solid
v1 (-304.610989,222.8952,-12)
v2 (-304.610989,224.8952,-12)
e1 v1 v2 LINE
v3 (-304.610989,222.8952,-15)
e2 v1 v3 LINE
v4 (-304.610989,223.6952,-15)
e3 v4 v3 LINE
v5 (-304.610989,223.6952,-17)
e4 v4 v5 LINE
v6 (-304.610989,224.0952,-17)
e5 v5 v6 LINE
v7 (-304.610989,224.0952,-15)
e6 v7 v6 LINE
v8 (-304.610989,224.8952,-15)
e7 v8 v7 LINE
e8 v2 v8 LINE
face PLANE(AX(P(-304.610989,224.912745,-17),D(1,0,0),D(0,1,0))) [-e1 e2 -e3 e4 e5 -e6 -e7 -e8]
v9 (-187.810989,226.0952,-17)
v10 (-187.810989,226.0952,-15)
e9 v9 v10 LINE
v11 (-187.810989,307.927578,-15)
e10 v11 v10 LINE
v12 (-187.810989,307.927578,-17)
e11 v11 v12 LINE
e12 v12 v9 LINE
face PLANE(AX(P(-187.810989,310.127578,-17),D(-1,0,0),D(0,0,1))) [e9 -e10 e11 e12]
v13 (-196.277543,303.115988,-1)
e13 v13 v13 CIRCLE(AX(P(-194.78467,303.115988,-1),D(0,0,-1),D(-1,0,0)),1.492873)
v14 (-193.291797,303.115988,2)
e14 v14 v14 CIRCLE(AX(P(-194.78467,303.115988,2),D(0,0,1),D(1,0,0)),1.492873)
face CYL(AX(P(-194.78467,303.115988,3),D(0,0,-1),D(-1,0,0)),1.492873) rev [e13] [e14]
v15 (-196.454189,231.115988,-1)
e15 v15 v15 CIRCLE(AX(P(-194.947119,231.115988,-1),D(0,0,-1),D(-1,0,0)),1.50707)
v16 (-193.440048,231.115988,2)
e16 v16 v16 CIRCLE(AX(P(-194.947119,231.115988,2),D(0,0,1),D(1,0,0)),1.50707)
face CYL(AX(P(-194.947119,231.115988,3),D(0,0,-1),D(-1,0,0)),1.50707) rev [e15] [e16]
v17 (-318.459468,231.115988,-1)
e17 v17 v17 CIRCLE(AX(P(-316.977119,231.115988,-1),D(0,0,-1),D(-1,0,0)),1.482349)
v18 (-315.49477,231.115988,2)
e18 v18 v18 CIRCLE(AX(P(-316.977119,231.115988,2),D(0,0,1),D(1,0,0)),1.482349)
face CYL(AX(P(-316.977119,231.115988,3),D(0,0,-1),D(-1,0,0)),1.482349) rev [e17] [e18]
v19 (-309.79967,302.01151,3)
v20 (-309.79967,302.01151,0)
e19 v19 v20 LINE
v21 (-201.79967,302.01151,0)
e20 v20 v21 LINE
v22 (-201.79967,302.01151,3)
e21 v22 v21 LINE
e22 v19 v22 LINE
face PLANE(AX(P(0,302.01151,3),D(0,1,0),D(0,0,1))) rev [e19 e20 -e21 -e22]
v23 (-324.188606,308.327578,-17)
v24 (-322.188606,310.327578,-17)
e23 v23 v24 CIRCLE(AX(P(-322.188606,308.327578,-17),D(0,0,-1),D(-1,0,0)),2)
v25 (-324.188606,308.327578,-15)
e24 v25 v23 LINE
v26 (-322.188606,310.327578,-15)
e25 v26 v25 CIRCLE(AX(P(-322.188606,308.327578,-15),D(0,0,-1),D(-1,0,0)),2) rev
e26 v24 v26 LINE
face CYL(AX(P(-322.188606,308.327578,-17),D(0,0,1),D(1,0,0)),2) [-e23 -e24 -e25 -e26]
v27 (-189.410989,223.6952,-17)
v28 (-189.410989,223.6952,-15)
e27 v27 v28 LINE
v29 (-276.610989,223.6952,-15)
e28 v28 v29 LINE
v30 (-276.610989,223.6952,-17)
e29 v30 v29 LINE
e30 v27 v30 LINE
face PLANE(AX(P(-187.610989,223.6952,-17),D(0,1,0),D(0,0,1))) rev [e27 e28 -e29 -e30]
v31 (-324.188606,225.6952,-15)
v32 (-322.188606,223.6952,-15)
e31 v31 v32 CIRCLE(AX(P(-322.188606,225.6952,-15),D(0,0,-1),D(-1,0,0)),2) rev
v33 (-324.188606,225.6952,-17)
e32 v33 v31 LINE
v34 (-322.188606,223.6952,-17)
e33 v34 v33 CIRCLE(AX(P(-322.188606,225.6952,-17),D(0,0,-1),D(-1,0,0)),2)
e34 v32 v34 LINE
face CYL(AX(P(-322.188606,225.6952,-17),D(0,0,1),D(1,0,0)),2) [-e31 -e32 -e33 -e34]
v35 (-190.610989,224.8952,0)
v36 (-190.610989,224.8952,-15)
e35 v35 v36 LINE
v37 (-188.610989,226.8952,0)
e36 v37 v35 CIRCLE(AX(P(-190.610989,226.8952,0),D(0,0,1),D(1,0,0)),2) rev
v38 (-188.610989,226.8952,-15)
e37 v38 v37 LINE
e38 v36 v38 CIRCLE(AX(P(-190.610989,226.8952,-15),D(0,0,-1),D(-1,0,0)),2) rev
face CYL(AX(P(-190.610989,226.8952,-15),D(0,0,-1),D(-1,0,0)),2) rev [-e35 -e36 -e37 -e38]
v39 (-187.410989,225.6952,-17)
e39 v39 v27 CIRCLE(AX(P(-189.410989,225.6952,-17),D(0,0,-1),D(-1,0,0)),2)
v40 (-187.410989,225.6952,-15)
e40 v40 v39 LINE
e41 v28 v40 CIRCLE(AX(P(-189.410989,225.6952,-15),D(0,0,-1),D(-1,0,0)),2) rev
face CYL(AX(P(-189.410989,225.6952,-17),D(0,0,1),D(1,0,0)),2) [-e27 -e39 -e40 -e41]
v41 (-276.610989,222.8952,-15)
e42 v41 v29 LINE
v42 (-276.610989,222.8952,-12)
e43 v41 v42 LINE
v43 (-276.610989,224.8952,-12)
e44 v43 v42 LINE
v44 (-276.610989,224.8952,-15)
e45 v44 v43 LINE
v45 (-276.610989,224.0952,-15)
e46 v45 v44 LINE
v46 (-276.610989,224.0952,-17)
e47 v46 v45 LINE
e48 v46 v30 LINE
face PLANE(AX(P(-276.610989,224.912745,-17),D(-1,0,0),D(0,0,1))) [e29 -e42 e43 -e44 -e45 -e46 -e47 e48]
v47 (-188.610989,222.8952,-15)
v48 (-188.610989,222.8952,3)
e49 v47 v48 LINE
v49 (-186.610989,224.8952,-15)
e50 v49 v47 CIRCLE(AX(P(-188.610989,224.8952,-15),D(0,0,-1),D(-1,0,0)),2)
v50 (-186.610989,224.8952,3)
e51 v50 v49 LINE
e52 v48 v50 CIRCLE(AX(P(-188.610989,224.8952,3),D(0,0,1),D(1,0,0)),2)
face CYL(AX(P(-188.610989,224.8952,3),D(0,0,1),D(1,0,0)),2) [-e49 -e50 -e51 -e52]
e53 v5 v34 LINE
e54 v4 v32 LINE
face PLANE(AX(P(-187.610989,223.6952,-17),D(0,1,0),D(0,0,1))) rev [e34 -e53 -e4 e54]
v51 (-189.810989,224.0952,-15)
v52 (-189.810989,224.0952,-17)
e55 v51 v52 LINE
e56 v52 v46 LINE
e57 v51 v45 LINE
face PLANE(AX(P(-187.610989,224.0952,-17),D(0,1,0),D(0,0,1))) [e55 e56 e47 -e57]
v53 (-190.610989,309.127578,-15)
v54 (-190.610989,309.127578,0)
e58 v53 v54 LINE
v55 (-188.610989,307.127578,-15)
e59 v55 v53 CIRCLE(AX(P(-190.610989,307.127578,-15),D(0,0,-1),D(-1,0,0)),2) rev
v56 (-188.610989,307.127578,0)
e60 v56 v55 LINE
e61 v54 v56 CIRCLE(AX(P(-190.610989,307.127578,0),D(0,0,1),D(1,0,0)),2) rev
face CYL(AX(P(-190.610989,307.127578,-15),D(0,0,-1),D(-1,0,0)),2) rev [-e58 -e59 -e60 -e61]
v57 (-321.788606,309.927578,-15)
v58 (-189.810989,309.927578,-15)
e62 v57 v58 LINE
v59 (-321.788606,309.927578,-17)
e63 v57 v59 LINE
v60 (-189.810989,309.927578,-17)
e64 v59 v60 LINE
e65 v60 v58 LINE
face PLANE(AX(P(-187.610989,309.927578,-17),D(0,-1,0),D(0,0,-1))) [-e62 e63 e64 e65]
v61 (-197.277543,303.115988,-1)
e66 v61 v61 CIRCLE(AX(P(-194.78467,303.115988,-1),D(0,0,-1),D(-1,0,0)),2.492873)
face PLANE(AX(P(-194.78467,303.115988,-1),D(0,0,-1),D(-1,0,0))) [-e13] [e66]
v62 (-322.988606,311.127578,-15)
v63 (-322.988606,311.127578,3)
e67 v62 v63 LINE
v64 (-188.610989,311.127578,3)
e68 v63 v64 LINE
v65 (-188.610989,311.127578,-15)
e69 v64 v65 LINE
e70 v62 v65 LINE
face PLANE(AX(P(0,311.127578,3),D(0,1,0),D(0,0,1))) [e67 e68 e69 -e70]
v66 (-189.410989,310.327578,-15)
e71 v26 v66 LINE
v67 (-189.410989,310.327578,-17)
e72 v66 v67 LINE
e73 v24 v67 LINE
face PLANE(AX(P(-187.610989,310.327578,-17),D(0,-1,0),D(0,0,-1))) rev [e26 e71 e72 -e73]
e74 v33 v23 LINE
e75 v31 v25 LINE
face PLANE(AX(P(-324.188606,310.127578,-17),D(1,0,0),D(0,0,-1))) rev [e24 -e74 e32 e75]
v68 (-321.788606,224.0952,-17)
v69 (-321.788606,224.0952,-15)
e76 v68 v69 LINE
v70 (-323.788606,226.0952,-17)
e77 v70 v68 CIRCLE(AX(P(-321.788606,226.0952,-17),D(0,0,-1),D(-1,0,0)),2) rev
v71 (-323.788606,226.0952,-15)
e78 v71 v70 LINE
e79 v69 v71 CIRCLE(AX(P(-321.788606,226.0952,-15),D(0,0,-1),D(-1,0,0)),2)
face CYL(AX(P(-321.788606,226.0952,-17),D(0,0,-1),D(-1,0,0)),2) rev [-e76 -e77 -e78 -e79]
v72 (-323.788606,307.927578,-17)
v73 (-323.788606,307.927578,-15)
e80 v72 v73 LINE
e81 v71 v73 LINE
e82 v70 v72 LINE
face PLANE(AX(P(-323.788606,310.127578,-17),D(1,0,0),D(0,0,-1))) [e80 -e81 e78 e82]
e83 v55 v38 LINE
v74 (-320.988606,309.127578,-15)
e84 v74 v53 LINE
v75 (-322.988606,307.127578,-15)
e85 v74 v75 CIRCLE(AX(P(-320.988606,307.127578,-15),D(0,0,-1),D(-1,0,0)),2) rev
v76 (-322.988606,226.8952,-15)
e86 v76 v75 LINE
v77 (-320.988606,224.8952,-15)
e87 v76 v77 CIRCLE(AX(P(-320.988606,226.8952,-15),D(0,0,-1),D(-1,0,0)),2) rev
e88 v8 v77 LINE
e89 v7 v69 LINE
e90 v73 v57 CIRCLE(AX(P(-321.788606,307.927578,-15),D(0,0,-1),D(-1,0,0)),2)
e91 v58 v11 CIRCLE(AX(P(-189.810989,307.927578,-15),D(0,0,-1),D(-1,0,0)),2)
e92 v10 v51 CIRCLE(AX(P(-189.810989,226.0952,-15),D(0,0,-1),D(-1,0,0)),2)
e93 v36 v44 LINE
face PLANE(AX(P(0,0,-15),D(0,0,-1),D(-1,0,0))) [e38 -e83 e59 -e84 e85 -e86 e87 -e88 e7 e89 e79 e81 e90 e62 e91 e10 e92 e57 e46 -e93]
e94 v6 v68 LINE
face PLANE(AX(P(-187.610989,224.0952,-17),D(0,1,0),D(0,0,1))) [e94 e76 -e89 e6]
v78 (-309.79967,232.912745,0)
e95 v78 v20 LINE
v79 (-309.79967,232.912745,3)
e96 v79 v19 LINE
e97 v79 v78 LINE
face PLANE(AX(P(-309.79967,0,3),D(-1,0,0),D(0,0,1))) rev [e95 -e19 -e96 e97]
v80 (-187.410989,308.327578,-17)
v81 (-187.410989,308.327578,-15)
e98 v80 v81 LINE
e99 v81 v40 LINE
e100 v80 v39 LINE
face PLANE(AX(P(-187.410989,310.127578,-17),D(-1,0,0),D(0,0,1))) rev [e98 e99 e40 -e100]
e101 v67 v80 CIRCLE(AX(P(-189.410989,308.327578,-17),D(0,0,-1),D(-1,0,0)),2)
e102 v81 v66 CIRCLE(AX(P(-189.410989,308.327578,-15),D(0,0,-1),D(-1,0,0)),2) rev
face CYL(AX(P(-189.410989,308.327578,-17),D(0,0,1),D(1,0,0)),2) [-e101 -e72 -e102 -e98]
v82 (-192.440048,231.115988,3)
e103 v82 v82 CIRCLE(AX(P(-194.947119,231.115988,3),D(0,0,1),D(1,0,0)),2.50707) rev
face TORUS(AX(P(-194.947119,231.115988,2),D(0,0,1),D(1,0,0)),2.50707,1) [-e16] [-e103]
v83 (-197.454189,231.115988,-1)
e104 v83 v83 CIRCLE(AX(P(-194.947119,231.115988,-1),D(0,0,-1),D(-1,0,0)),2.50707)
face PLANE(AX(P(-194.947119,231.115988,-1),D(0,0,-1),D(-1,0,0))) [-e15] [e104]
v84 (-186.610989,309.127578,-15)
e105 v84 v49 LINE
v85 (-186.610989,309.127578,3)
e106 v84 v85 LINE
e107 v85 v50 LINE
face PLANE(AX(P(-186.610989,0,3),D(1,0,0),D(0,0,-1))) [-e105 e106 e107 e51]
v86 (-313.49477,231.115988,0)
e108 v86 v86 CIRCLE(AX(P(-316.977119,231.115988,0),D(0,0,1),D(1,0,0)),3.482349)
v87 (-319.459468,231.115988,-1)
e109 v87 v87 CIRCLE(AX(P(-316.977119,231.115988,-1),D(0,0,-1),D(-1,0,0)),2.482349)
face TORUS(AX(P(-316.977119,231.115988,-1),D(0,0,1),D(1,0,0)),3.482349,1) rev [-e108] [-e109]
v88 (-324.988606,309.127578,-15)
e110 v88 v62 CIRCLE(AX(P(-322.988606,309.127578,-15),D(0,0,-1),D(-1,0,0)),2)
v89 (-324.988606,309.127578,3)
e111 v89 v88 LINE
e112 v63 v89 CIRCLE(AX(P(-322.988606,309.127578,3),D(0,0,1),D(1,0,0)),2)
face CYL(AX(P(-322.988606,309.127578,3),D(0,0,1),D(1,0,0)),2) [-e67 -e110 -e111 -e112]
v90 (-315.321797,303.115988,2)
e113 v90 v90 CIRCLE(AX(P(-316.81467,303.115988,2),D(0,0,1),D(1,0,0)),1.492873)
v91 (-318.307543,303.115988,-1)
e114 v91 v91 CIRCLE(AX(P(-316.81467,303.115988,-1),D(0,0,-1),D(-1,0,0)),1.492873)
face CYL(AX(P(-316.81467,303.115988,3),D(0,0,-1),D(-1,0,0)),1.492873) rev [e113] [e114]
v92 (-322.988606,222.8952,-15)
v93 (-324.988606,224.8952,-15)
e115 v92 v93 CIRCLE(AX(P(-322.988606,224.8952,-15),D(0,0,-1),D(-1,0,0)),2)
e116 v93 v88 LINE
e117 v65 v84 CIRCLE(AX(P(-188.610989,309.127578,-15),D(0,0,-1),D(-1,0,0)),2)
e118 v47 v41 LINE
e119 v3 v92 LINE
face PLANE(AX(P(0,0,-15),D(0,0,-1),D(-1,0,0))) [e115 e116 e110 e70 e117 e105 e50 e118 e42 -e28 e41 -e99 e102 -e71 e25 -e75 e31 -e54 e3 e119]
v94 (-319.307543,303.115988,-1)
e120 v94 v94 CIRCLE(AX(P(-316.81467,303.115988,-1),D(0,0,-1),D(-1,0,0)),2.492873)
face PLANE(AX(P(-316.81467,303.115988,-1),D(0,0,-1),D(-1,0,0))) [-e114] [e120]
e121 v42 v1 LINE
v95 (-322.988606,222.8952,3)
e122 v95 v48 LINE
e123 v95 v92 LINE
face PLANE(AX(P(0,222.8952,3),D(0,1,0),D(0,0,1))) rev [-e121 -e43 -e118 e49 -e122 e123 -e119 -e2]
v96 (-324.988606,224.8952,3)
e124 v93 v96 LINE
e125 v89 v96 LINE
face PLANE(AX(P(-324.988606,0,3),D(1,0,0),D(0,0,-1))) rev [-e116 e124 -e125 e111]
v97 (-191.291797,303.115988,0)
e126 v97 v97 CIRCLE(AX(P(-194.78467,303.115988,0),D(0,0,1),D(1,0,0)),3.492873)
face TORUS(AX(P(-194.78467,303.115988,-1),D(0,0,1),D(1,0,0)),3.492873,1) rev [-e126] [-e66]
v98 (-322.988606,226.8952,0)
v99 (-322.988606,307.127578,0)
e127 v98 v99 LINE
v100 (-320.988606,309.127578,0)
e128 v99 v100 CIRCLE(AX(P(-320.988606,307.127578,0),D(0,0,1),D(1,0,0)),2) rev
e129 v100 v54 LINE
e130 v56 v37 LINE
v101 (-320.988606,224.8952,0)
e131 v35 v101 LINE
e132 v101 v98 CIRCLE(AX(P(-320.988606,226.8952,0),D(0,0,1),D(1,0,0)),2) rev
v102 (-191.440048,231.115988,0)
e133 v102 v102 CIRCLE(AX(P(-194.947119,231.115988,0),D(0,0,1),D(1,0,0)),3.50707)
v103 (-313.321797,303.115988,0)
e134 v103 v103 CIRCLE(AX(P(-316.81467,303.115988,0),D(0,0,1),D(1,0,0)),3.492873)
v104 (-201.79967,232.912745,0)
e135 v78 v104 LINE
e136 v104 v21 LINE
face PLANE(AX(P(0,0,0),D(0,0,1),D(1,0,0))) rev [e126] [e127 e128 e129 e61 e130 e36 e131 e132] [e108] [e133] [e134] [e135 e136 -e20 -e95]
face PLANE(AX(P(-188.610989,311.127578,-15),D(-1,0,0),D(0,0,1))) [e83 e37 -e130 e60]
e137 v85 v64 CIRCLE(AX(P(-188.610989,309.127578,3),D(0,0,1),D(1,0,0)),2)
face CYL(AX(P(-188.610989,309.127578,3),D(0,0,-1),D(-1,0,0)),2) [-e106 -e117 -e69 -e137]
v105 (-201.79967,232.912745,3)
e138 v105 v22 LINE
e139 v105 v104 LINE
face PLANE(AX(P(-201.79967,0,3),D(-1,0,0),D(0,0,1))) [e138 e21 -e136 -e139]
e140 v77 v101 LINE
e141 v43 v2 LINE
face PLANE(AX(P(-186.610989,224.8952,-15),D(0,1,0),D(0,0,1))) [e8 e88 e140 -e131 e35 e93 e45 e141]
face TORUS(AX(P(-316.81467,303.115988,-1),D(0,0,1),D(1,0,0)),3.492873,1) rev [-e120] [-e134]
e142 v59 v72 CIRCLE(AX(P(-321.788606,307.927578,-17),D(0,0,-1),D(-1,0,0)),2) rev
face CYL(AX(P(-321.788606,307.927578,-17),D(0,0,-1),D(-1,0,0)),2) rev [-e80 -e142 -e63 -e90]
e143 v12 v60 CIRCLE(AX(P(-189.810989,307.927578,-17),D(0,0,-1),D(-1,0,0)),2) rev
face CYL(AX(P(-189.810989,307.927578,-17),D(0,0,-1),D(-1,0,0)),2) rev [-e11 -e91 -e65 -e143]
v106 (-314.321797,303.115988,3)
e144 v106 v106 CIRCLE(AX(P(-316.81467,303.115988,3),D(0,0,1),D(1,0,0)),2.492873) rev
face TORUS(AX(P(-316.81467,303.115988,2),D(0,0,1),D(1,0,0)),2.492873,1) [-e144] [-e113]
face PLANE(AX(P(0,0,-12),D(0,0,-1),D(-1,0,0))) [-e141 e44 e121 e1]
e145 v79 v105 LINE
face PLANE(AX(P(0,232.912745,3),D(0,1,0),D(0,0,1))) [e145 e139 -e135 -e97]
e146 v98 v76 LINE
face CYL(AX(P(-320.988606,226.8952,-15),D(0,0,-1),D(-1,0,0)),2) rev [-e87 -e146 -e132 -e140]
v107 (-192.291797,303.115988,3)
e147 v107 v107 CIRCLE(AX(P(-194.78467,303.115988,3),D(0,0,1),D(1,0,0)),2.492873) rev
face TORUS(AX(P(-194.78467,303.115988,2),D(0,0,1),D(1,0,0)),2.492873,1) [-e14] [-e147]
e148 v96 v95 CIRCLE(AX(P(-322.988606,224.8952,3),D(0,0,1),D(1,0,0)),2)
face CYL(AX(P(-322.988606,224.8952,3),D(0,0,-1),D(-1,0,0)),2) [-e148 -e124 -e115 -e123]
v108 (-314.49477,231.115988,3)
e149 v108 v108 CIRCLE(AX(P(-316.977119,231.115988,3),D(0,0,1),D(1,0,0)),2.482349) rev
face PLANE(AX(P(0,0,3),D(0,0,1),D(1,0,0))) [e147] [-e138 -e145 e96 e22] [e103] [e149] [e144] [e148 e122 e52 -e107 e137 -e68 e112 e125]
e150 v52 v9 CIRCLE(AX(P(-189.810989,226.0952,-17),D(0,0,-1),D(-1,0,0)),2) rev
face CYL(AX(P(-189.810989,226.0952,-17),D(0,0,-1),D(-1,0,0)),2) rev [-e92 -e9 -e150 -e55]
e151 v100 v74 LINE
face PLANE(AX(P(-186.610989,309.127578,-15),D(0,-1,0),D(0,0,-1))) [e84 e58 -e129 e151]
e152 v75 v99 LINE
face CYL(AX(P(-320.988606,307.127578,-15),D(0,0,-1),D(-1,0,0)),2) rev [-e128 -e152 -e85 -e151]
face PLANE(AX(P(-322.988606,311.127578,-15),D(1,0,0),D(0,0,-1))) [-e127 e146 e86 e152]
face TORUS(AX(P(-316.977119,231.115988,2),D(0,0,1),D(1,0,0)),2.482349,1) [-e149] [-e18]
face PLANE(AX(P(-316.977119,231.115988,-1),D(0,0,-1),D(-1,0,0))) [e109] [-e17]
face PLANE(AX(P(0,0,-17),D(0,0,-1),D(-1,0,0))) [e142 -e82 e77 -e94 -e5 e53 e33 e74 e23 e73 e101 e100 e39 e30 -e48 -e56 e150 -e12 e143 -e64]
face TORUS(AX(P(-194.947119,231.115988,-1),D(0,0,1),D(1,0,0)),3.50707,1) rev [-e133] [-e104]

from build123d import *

# Parameters (mm, degrees)
SZKIC2_W                          = 138.377616904
SZKIC2_H                          = 88.232378654
SZKIC2_R                          = 1.492872888
SZKIC2_R_2                        = 1.482348965
SZKIC2_R_3                        = 1.507070184
SZKIC2_W_2                        = 108
SZKIC2_H_2                        = 69.098765565
DODANIE_WYCI_GNI_CIE1_DEPTH       = 3
SZKIC3_W                          = 138.377616904
SZKIC3_H                          = 88.232378654
SZKIC3_W_2                        = 134.377616904
SZKIC3_H_2                        = 84.232378654
WYCI_GNI_CIE_CIENKA_CIANKA1_DEPTH = 15
ZAOKR_GLENIE1_R                   = 1
DODANIE_WYCI_GNI_CIE2_START       = 1
SZKIC4_R                          = 2.492872888
SZKIC4_R_2                        = 1.492872888
SZKIC4_R_3                        = 2.507070184
SZKIC4_R_4                        = 1.507070184
SZKIC4_R_5                        = 2.482348965
SZKIC4_R_6                        = 1.482348965
DODANIE_WYCI_GNI_CIE2_DEPTH       = 1
ZAOKR_GLENIE2_R                   = 1
SZKIC5_W                          = 136.777616904
SZKIC5_H                          = 86.632378654
SZKIC5_W_2                        = 135.977616904
SZKIC5_H_2                        = 85.832378654
WYCI_GNI_CIE_CIENKA_CIANKA2_DEPTH = 2
ZAOKR_GLENIE3_R                   = 2
WYTNIJ_WYCI_GNI_CIE1_START        = 12
SZKIC6_W                          = 28
SZKIC6_H                          = 7.331859192
WYTNIJ_WYCI_GNI_CIE1_DEPTH        = 439.2299015


with BuildPart() as part:
    # Szkic2 → Dodanie-wyciągnięcie1 (new body)
    with BuildSketch(Plane.XY):
        with Locations((-255.799797678, 267.011389153)):
            Rectangle(SZKIC2_W, SZKIC2_H)
        with Locations((-316.814669774, 303.115988479)):
            Circle(SZKIC2_R, mode=Mode.SUBTRACT)
        with Locations((-316.977118633, 231.115988479)):
            Circle(SZKIC2_R_2, mode=Mode.SUBTRACT)
        with Locations((-194.947118633, 231.115988479)):
            Circle(SZKIC2_R_3, mode=Mode.SUBTRACT)
        with Locations((-194.784669774, 303.115988479)):
            Circle(SZKIC2_R, mode=Mode.SUBTRACT)
        with Locations((-255.799669774, 267.462127396)):
            Rectangle(SZKIC2_W_2, SZKIC2_H_2, mode=Mode.SUBTRACT)
    extrude(amount=DODANIE_WYCI_GNI_CIE1_DEPTH)

    # Szkic3 → Wyciągnięcie-cienka ścianka1 (add)
    with BuildSketch(Plane(origin=(0, 0, 0), x_dir=(-1, 0, 0), z_dir=(0, 0, -1))):
        with Locations((255.799797678, 267.011389153)):
            Rectangle(SZKIC3_W, SZKIC3_H)
        with Locations((255.799797678, 267.011389153)):
            Rectangle(SZKIC3_W_2, SZKIC3_H_2, mode=Mode.SUBTRACT)
    extrude(amount=WYCI_GNI_CIE_CIENKA_CIANKA1_DEPTH)

    # Zaokrąglenie1
    zaokr_glenie1_edges = [part.edges().sort_by_distance(p)[0] for p in [
        (-318.307542662, 303.115988479, 3),
        (-318.459467597, 231.115988479, 3),
        (-196.454188817, 231.115988479, 3),
        (-196.277542662, 303.115988479, 3),
    ]]
    fillet(zaokr_glenie1_edges, radius=ZAOKR_GLENIE1_R)

    # Szkic4 → Dodanie-wyciągnięcie2 (add)
    # profile 1 of 4: a face of its own
    with BuildSketch(Plane(origin=(0, 0, 0), x_dir=(-1, 0, 0), z_dir=(0, 0, -1)).offset(DODANIE_WYCI_GNI_CIE2_START)):
        with Locations(Location((194.784669774, 303.115988479, 0), (0, 0, 180))):
            Circle(SZKIC4_R)
        with Locations((194.784669774, 303.115988479)):
            Circle(SZKIC4_R_2, mode=Mode.SUBTRACT)
    # profile 2 of 4: a face of its own
    with BuildSketch(Plane(origin=(0, 0, 0), x_dir=(-1, 0, 0), z_dir=(0, 0, -1)).offset(DODANIE_WYCI_GNI_CIE2_START)):
        with Locations(Location((194.947118633, 231.115988479, 0), (0, 0, 180))):
            Circle(SZKIC4_R_3)
        with Locations((194.947118633, 231.115988479)):
            Circle(SZKIC4_R_4, mode=Mode.SUBTRACT)
    # profile 3 of 4: a face of its own
    with BuildSketch(Plane(origin=(0, 0, 0), x_dir=(-1, 0, 0), z_dir=(0, 0, -1)).offset(DODANIE_WYCI_GNI_CIE2_START)):
        with Locations(Location((316.977118633, 231.115988479, 0), (0, 0, 180))):
            Circle(SZKIC4_R_5)
        with Locations((316.977118633, 231.115988479)):
            Circle(SZKIC4_R_6, mode=Mode.SUBTRACT)
    # profile 4 of 4: a face of its own
    with BuildSketch(Plane(origin=(0, 0, 0), x_dir=(-1, 0, 0), z_dir=(0, 0, -1)).offset(DODANIE_WYCI_GNI_CIE2_START)):
        with Locations(Location((316.814669774, 303.115988479, 0), (0, 0, 180))):
            Circle(SZKIC4_R)
        with Locations((316.814669774, 303.115988479)):
            Circle(SZKIC4_R_2, mode=Mode.SUBTRACT)
    extrude(amount=-DODANIE_WYCI_GNI_CIE2_DEPTH)

    # Zaokrąglenie2
    zaokr_glenie2_edges = [part.edges().sort_by_distance(p)[0] for p in [
        (-197.277542662, 303.115988479, 0),
        (-197.454188817, 231.115988479, 0),
        (-319.459467597, 231.115988479, 0),
        (-319.307542662, 303.115988479, 0),
    ]]
    fillet(zaokr_glenie2_edges, radius=ZAOKR_GLENIE2_R - 0.0001)  # a hair under: the kernel refuses the full size

    # Szkic5 → Wyciągnięcie-cienka ścianka2 (add)
    with BuildSketch(Plane(origin=(0, 0, -15), x_dir=(-1, 0, 0), z_dir=(0, 0, -1))):
        with Locations((255.799797678, 267.011389153)):
            Rectangle(SZKIC5_W, SZKIC5_H)
        with Locations((255.799797678, 267.011389153)):
            Rectangle(SZKIC5_W_2, SZKIC5_H_2, mode=Mode.SUBTRACT)
    extrude(amount=WYCI_GNI_CIE_CIENKA_CIANKA2_DEPTH)

    # Zaokrąglenie3
    zaokr_glenie3_edges = [part.edges().sort_by_distance(p)[0] for p in [
        (-187.410989226, 310.32757848, -16),
        (-187.410989226, 223.695199826, -16),
        (-324.18860613, 223.695199826, -16),
        (-324.18860613, 310.32757848, -16),
        (-187.810989226, 224.095199826, -16),
        (-323.78860613, 224.095199826, -16),
        (-323.78860613, 309.92757848, -16),
        (-187.810989226, 309.92757848, -16),
        (-186.610989226, 222.895199826, -6),
        (-324.98860613, 222.895199826, -6),
        (-324.98860613, 311.12757848, -6),
        (-186.610989226, 311.12757848, -6),
        (-188.610989226, 224.895199826, -7.5),
        (-322.98860613, 224.895199826, -7.5),
        (-322.98860613, 309.12757848, -7.5),
        (-188.610989226, 309.12757848, -7.5),
    ]]
    fillet(zaokr_glenie3_edges, radius=ZAOKR_GLENIE3_R)

    # Szkic6 → Wytnij-wyciągnięcie1 (cut, through all)
    with BuildSketch(Plane(origin=(0, 0, 0), x_dir=(-1, 0, 0), z_dir=(0, 0, -1)).offset(WYTNIJ_WYCI_GNI_CIE1_START)):
        with Locations((290.610989226, 221.246815017)):
            Rectangle(SZKIC6_W, SZKIC6_H)
    extrude(amount=WYTNIJ_WYCI_GNI_CIE1_DEPTH, mode=Mode.SUBTRACT)


solid = part.part
